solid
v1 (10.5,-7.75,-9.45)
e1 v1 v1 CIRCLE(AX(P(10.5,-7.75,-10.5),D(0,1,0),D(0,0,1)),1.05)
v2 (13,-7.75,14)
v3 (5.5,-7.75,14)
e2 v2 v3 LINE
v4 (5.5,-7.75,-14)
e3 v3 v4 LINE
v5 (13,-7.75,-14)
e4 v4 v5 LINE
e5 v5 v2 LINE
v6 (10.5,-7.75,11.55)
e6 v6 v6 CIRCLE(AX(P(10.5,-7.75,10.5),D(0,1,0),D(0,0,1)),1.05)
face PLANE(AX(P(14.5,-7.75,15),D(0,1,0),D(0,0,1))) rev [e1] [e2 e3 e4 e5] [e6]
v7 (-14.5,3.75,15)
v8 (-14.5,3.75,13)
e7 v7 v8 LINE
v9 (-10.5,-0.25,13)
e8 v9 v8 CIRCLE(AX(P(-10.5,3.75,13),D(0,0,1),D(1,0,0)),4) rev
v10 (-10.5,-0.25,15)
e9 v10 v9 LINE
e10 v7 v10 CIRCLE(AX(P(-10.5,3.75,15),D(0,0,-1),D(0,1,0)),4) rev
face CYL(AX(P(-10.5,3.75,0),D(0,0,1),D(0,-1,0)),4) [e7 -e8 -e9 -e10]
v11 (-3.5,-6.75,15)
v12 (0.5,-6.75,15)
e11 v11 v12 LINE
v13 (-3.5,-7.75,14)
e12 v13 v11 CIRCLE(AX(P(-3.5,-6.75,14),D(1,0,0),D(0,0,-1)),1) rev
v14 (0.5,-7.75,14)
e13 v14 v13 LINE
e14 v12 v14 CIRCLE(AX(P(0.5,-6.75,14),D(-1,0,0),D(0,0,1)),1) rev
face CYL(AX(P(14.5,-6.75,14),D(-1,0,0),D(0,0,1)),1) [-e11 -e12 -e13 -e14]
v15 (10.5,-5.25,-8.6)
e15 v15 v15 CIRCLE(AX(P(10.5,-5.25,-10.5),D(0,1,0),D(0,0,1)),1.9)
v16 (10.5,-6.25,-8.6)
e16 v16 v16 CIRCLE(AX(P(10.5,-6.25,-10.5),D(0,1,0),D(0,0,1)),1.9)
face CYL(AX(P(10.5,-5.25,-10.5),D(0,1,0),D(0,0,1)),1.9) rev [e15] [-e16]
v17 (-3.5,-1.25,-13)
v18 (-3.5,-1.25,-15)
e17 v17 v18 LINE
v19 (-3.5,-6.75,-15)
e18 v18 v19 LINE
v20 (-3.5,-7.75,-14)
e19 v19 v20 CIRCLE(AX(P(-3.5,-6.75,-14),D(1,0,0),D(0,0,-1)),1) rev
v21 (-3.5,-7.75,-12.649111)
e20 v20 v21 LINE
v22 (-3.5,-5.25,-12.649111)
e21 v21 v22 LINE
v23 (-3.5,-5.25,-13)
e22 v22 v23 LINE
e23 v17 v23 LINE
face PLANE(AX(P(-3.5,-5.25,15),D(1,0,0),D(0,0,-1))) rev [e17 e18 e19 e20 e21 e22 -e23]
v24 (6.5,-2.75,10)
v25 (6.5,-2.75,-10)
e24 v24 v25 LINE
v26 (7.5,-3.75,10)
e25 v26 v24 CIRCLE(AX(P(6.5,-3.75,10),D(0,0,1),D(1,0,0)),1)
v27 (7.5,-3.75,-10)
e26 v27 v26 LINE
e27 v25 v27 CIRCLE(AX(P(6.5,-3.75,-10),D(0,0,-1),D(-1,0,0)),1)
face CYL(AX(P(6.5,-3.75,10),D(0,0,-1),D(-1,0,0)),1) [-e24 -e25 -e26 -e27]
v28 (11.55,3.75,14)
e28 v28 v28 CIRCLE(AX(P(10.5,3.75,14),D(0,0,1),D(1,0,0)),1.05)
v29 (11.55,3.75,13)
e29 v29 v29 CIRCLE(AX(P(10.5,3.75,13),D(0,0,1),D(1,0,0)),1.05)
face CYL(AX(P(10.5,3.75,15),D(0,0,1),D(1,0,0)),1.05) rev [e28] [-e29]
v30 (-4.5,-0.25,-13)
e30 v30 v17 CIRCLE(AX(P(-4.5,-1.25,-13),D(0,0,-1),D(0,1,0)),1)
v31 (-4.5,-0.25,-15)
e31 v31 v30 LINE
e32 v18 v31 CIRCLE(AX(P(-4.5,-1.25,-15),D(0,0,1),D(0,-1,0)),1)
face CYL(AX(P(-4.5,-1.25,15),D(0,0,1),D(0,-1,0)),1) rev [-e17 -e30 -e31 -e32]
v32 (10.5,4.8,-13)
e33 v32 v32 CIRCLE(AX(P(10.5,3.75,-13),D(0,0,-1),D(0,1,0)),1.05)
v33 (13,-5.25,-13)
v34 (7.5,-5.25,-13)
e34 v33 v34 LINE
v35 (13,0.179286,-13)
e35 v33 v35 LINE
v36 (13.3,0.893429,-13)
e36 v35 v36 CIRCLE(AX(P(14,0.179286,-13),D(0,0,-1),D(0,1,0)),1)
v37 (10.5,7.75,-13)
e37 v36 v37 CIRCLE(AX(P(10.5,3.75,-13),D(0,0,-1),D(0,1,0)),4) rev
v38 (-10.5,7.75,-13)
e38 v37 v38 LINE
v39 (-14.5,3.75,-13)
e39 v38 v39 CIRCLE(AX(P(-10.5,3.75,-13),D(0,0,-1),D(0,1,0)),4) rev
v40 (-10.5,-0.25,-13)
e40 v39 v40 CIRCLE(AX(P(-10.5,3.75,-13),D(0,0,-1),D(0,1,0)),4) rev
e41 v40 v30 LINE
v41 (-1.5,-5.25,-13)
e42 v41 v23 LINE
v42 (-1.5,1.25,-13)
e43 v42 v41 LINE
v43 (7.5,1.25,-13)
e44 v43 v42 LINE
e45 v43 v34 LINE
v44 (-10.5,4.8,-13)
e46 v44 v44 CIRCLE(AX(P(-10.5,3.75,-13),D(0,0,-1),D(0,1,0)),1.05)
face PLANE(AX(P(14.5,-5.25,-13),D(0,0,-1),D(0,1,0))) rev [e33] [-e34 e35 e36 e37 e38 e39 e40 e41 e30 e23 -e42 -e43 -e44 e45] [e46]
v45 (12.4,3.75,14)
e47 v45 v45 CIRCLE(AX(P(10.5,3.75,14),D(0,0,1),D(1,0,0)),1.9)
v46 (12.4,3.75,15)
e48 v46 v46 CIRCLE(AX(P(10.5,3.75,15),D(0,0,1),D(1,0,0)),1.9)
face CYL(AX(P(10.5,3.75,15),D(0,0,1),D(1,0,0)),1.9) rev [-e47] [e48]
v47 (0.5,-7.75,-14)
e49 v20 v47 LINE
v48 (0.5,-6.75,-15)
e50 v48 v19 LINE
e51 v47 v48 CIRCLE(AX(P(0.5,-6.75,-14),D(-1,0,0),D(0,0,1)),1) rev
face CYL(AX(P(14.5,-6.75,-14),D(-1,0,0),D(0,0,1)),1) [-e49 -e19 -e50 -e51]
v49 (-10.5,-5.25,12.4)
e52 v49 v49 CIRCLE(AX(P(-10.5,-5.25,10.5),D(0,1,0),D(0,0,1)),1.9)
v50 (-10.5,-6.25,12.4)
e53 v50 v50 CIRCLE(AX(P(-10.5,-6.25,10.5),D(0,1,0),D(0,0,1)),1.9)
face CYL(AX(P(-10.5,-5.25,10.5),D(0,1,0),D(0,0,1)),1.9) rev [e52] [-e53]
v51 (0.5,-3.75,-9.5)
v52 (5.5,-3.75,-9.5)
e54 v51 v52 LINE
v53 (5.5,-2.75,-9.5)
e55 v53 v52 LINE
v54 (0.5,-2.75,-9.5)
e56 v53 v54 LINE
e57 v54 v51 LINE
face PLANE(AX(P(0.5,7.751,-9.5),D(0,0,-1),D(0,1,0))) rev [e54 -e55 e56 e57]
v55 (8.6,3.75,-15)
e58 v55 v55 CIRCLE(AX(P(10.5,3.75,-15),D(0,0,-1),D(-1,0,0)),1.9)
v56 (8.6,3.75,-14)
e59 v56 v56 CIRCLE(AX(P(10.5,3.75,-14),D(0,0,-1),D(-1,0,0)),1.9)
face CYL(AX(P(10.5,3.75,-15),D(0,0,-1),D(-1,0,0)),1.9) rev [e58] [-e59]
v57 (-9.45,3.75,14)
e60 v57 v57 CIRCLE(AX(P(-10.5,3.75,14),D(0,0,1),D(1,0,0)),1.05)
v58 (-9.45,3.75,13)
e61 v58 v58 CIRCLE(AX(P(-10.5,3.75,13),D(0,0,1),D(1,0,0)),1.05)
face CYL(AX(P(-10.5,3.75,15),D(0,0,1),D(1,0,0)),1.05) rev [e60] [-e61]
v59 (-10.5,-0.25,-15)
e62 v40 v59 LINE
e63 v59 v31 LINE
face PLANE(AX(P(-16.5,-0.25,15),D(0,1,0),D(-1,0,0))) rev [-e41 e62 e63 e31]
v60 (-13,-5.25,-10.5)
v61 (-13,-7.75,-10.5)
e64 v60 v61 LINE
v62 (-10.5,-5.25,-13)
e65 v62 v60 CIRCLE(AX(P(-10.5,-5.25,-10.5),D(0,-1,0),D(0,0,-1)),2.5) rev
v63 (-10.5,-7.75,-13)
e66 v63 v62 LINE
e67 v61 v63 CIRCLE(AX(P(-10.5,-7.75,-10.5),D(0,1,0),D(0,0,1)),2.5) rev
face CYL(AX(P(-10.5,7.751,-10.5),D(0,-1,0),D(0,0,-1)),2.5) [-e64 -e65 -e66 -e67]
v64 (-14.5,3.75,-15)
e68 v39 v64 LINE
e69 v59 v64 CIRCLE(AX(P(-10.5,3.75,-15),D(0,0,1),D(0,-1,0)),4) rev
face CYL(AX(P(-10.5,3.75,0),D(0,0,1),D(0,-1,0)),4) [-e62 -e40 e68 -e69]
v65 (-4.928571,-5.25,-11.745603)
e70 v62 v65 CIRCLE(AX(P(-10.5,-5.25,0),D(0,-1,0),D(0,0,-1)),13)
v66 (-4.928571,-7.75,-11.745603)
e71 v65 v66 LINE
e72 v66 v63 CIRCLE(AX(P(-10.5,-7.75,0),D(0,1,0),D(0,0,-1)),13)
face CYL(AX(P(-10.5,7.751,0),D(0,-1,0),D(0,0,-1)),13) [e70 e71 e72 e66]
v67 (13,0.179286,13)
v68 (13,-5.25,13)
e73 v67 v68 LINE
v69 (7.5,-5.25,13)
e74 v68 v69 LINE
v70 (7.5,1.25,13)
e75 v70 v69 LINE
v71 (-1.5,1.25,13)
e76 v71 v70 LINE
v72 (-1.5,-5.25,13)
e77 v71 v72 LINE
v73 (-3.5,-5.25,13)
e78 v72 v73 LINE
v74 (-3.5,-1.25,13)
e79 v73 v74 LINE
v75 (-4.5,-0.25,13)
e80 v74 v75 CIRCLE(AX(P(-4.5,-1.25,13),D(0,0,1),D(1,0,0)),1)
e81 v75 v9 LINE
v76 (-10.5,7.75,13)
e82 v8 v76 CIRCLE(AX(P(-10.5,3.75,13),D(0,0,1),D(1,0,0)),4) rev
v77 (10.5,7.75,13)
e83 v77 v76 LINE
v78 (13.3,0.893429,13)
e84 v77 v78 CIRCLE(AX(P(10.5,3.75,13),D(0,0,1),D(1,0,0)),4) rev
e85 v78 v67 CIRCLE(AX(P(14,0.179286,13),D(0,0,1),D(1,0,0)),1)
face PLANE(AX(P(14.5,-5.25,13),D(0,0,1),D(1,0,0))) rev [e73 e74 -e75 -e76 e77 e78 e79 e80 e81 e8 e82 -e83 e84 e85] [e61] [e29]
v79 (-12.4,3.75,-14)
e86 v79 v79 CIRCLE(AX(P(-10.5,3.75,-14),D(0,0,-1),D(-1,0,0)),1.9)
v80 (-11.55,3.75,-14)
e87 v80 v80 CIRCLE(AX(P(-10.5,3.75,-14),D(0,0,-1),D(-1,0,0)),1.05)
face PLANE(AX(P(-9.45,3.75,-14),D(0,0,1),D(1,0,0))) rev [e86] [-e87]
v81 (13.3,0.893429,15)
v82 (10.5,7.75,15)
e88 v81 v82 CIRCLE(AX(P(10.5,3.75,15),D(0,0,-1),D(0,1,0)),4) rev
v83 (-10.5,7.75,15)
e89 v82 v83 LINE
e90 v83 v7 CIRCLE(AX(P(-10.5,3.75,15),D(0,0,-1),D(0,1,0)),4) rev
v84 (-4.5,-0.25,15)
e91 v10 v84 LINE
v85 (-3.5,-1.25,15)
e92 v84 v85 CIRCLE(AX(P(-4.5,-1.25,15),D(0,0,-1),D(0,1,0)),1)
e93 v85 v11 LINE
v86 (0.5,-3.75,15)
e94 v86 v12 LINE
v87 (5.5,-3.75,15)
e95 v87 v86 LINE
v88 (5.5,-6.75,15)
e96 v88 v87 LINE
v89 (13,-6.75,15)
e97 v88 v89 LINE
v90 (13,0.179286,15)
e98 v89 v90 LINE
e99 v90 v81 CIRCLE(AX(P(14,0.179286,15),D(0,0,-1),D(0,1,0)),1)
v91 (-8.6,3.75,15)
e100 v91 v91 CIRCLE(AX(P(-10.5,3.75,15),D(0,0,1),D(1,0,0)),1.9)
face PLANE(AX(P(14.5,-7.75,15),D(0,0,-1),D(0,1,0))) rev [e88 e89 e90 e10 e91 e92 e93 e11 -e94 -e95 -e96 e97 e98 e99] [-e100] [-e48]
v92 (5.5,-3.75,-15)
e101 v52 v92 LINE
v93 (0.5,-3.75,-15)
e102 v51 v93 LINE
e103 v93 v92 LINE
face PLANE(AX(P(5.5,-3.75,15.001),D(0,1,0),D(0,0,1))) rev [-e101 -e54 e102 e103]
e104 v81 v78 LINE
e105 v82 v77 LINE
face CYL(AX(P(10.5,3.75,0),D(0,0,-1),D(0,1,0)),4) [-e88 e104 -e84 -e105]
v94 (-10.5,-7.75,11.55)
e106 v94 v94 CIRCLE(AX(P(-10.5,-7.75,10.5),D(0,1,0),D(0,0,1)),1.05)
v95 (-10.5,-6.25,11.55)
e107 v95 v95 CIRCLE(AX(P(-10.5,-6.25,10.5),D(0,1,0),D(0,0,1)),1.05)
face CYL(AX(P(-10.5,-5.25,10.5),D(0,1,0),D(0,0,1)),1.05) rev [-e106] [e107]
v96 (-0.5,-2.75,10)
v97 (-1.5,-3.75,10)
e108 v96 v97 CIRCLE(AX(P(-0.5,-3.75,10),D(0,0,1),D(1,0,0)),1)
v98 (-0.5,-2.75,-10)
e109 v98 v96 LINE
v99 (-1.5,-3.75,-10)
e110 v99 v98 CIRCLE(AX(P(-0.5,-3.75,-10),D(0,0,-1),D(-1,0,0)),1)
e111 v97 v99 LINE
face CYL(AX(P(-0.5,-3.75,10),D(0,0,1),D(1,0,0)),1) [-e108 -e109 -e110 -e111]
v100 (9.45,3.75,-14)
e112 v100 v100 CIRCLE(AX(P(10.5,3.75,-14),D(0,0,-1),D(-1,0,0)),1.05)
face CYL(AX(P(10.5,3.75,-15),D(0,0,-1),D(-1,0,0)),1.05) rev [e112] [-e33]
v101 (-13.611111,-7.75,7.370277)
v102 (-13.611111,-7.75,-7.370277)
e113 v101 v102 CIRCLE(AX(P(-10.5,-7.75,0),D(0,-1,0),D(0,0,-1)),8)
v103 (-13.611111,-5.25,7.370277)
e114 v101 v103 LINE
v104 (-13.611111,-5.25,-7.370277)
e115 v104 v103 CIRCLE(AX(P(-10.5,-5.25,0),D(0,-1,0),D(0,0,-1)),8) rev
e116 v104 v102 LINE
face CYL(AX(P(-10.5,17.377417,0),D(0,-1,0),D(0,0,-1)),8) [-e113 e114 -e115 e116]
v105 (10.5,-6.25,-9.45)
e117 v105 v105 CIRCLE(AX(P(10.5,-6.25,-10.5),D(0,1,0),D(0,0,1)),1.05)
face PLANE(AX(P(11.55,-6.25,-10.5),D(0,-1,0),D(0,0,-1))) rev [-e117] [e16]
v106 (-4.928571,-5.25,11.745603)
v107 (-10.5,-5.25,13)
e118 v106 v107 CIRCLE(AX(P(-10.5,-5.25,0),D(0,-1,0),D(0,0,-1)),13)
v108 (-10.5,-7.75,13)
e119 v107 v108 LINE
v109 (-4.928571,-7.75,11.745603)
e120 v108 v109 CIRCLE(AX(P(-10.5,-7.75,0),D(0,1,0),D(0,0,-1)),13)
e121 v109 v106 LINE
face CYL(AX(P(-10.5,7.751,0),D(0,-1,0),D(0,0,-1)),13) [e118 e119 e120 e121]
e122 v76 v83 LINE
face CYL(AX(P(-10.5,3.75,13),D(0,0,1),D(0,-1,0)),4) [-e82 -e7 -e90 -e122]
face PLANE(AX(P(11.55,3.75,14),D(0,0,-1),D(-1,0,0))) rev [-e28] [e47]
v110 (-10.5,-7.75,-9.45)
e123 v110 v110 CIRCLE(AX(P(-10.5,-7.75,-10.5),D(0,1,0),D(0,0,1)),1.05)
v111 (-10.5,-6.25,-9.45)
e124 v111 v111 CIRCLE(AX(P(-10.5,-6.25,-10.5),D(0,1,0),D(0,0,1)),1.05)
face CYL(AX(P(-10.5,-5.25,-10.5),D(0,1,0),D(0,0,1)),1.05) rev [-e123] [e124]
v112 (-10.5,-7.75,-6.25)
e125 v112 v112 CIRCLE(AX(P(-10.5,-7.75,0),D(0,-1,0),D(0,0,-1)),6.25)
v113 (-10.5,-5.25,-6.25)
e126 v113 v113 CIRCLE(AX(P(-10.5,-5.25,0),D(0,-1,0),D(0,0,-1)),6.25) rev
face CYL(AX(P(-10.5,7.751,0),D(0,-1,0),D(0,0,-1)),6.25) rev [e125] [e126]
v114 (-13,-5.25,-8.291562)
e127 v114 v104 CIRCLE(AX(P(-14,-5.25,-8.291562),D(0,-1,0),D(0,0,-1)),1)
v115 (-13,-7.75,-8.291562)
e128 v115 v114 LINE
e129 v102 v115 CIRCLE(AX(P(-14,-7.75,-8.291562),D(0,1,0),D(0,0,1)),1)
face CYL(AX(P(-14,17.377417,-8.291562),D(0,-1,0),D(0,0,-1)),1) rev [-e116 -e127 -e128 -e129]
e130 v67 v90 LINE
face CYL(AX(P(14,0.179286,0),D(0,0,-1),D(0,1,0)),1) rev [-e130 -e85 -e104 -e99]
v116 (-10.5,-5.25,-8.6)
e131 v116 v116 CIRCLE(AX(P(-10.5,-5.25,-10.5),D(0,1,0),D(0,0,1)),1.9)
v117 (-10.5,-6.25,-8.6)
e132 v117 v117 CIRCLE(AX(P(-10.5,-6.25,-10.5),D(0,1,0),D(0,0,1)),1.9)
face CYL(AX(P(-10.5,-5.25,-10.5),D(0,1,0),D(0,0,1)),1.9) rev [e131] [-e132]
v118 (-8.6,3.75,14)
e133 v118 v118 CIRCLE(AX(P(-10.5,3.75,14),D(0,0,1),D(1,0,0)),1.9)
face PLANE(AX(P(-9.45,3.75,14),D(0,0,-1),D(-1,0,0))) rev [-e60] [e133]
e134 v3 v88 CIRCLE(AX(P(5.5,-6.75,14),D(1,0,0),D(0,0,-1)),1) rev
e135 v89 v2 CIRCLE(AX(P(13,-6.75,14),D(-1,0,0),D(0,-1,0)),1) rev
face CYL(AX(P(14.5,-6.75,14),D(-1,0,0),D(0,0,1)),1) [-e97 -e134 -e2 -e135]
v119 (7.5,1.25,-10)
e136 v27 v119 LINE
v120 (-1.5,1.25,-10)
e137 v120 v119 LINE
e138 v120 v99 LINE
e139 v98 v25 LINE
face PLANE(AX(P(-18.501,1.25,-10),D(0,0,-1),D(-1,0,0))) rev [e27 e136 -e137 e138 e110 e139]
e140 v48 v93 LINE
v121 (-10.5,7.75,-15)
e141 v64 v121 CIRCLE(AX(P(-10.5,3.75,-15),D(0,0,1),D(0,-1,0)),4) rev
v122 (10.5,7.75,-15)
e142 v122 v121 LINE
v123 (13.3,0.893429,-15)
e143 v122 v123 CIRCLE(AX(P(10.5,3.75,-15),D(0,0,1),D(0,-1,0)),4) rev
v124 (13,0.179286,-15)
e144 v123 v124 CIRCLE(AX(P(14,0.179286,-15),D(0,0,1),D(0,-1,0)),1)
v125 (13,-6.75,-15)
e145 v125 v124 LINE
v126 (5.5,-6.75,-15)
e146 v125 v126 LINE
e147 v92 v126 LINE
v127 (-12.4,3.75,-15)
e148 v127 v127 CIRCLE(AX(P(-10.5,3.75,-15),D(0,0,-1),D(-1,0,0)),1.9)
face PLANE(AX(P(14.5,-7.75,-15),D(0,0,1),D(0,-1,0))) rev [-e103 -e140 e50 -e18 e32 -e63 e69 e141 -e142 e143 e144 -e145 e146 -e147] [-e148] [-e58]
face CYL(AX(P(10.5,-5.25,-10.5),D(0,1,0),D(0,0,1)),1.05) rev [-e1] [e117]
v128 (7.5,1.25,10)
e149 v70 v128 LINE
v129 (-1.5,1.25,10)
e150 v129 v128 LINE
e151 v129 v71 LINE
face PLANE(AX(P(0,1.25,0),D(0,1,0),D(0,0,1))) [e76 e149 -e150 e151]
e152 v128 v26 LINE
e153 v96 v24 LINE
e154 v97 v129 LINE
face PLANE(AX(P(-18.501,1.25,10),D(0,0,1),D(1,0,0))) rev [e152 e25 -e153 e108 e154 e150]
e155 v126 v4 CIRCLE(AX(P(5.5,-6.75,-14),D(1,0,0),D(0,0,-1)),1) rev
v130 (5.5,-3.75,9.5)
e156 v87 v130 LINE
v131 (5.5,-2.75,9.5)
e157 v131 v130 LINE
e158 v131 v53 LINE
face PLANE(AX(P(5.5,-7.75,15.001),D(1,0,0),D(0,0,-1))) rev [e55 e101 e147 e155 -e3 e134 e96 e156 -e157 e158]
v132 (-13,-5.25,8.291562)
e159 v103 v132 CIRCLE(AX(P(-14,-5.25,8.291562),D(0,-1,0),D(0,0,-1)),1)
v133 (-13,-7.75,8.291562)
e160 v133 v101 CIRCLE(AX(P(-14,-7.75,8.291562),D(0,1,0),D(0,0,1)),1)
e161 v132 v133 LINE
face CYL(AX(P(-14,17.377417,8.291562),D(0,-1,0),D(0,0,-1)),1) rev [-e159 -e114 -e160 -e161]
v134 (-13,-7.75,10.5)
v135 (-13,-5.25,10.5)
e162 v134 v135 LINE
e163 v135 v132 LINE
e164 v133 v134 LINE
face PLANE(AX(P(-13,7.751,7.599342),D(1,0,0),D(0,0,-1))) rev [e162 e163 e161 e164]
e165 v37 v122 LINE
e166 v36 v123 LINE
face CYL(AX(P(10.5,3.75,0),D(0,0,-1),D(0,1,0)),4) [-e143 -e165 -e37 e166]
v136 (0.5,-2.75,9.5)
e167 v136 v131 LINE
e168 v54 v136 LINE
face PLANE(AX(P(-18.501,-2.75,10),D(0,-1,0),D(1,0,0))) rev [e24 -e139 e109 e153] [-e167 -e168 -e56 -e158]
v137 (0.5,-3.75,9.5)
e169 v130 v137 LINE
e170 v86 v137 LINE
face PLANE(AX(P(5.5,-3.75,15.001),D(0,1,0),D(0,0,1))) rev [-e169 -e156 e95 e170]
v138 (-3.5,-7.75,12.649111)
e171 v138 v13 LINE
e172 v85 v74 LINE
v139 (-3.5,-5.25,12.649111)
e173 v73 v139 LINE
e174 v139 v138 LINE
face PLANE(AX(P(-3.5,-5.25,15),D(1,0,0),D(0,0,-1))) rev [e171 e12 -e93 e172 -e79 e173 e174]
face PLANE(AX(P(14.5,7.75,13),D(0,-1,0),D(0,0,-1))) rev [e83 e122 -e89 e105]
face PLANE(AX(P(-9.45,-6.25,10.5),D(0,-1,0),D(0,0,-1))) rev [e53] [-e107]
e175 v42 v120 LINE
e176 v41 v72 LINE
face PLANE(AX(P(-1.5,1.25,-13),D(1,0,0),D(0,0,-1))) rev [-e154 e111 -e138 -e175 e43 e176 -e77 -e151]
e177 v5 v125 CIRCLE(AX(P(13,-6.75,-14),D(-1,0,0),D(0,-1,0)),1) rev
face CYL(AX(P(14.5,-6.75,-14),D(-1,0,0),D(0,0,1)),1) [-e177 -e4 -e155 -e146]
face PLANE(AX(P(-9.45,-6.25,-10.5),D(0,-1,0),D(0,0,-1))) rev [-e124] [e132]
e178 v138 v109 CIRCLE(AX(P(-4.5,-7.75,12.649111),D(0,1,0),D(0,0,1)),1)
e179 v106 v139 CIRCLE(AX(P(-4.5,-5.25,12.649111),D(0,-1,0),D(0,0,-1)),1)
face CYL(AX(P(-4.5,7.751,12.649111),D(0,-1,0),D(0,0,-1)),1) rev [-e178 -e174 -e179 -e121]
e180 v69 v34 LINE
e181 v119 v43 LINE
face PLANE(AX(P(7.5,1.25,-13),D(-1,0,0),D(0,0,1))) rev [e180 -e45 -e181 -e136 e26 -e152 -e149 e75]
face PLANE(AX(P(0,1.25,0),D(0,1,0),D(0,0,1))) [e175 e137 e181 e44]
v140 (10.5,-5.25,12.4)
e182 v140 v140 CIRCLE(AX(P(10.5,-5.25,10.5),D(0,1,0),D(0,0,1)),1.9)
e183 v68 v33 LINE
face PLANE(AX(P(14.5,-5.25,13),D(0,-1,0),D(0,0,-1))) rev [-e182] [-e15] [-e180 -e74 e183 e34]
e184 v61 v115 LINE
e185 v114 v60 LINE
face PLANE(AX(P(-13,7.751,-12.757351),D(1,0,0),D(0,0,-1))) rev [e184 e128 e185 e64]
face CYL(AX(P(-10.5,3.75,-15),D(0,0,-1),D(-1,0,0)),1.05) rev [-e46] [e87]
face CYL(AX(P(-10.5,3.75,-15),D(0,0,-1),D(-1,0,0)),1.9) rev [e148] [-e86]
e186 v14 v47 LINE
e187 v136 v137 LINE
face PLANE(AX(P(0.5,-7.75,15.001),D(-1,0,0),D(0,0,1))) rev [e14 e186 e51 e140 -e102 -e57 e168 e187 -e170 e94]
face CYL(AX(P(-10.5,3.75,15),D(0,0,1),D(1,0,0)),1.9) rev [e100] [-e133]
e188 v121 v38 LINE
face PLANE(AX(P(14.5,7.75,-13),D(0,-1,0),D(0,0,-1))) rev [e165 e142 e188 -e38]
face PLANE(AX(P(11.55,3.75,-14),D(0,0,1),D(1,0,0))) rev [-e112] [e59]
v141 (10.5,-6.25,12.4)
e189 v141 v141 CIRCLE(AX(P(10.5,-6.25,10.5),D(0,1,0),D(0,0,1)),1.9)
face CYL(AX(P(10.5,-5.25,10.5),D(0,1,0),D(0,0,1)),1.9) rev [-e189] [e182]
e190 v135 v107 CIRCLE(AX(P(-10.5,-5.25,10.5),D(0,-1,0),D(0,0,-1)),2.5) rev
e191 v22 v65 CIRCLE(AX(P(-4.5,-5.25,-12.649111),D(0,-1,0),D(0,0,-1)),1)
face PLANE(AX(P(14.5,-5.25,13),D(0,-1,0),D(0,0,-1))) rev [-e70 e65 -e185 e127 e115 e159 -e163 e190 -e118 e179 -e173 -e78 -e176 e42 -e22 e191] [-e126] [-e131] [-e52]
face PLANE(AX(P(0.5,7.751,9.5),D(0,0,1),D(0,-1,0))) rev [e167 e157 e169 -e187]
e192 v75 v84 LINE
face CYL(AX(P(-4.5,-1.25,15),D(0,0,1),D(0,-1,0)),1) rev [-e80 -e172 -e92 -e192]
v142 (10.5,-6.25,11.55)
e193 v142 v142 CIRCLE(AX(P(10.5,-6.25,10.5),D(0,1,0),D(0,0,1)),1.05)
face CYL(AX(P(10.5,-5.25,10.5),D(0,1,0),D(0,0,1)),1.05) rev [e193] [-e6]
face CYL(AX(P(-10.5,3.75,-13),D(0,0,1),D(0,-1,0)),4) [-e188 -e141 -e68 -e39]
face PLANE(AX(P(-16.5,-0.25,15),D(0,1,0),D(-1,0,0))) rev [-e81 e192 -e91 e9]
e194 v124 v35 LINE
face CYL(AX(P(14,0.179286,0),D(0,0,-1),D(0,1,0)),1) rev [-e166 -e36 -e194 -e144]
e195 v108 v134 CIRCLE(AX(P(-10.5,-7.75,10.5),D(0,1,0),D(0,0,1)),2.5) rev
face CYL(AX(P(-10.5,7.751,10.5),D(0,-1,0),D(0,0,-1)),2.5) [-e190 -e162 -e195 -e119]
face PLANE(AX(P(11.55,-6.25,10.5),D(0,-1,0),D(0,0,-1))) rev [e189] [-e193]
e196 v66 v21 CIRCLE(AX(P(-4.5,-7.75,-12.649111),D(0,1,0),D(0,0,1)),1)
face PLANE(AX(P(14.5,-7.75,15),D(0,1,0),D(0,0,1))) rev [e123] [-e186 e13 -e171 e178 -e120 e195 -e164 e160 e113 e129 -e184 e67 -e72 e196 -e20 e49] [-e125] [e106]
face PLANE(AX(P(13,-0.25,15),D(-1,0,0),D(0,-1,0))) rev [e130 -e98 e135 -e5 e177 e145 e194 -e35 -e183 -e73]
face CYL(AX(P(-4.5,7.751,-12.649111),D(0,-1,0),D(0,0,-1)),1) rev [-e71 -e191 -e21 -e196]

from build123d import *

# Parameters (mm, degrees)
EXTRUDE_1_DEPTH              = 14.5
HOLE_START                   = -15
HOLE_WIZARD_M2_1_OUTLINE_R   = 1.9
HOLE_WIZARD_M2_1_DEPTH       = 1
HOLE_START_2                 = -14
HOLE_WIZARD_M2_1_2_OUTLINE_R = 1.05
HOLE_WIZARD_M2_1_2_DEPTH     = 1
SKETCH_5_R                   = 8
EXTRUDE_2_DEPTH              = 2.5
SKETCH_10_W                  = 3
SKETCH_10_H                  = 10
CUT_EXTRUDE_4_DEPTH          = 37.087567111
SKETCH_9_W                   = 13
SKETCH_9_H                   = 5
CUT_EXTRUDE_3_DEPTH          = 37.087567111
FILLET_1_R                   = 4
CUT_EXTRUDE_START            = -2.5
CUT_EXTRUDE_5_OUTLINE_R      = 6.25
CUT_EXTRUDE_5_DEPTH          = 2.5
HOLE_WIZARD_M2_2_D           = 2.1
HOLE_WIZARD_M2_2_CBORE_D     = 3.8
HOLE_WIZARD_M2_2_CBORE_DEPTH = 1
FILLET_4_R                   = 2.5
FILLET_5_R                   = 1
SKETCH_14_W                  = 9
SKETCH_14_H                  = 26
EXTRUDE_4_DEPTH              = 6.5
CUT_EXTRUDE_6_REACH          = 33.001
SKETCH_15_W                  = 20
SKETCH_15_H                  = 4
CUT_EXTRUDE_7_REACH          = 38.088
SKETCH_16_W                  = 5
SKETCH_16_H                  = 4
CUT_EXTRUDE_8_REACH          = 28.448
SKETCH_17_W                  = 5
SKETCH_17_H                  = 19
CUT_EXTRUDE_9_DEPTH          = 37.087567111
FILLET_6_R                   = 1


# Read off the part's stored shape, not the designer's step: M2 丸平ねじ用座ぐり穴1, ｶｯﾄ - 押し出し5
with BuildPart() as part:
    # ｽｹｯﾁ1 → ﾎﾞｽ - 押し出し1 (new, symmetric)
    with BuildSketch(Plane(origin=(0, 0, 0), x_dir=(0, 0, -1), z_dir=(1, 0, 0))):
        Polygon((-15, -7.75), (15, -7.75), (15, 7.75), (13, 7.75), (13, -5.25), (-13, -5.25), (-13, 7.75), (-15, 7.75), align=None)
    extrude(amount=EXTRUDE_1_DEPTH, both=True)

    # M2 丸平ねじ用座ぐり穴1 outline → M2 丸平ねじ用座ぐり穴1 (cut)
    with BuildSketch(Plane.XY.offset(HOLE_START)):
        with Locations((-10.5, 3.75)):
            Circle(HOLE_WIZARD_M2_1_OUTLINE_R)
        with Locations((10.5, 3.75)):
            Circle(HOLE_WIZARD_M2_1_OUTLINE_R)
    hole_wizard_m2_1 = extrude(amount=HOLE_WIZARD_M2_1_DEPTH, mode=Mode.SUBTRACT)

    # Hole Wizard M2 _1 2 outline → Hole Wizard M2 _1 2 (cut)
    with BuildSketch(Plane.XY.offset(HOLE_START_2)):
        with Locations((-10.5, 3.75)):
            Circle(HOLE_WIZARD_M2_1_2_OUTLINE_R)
        with Locations((10.5, 3.75)):
            Circle(HOLE_WIZARD_M2_1_2_OUTLINE_R)
    hole_wizard_m2_1_2 = extrude(amount=HOLE_WIZARD_M2_1_2_DEPTH, mode=Mode.SUBTRACT)

    # ｽｹｯﾁ5 → ﾎﾞｽ - 押し出し2 (add)
    with BuildSketch(Plane.XZ.offset(7.75)):
        with Locations((-10.5, 0)):
            Circle(SKETCH_5_R)
    extrude(amount=-EXTRUDE_2_DEPTH)

    # ｽｹｯﾁ10 → ｶｯﾄ - 押し出し4 (cut, through all)
    with BuildSketch(Plane(origin=(0, 0, -15), x_dir=(-1, 0, 0), z_dir=(0, 0, -1))):
        with Locations((-14.5, -5.25)):
            Rectangle(SKETCH_10_W, SKETCH_10_H)
    extrude(amount=-CUT_EXTRUDE_4_DEPTH, mode=Mode.SUBTRACT)

    # ｽｹｯﾁ9 → ｶｯﾄ - 押し出し3 (cut, through all)
    with BuildSketch(Plane(origin=(0, 0, -15), x_dir=(-1, 0, 0), z_dir=(0, 0, -1))):
        with Locations((10, -2.75)):
            Rectangle(SKETCH_9_W, SKETCH_9_H)
    extrude(amount=-CUT_EXTRUDE_3_DEPTH, mode=Mode.SUBTRACT)

    # ﾌｨﾚｯﾄ1
    fillet_1_edges = [part.edges().sort_by_distance(p)[0] for p in [
        (-14.5, 7.75, 14),
        (14.5, 7.75, 14),
        (14.5, 7.75, -14),
        (-14.5, 7.75, -14),
        (-14.5, -0.25, 14),
        (-14.5, -0.25, -14),
    ]]
    fillet(fillet_1_edges, radius=FILLET_1_R - 0.0001)  # a hair under: the kernel refuses the full size

    # ｶｯﾄ - 押し出し5 outline → ｶｯﾄ - 押し出し5 (cut)
    with BuildSketch(Plane.XZ.offset(7.75).offset(CUT_EXTRUDE_START)):
        with BuildLine():
            Line((-14.5, -15), (-3.5, -15))
            Line((-3.5, -15), (-3.5, -10.95445115))
            ThreePointArc((-3.5, -10.95445115), (-8.076137007, -12.772035397), (-13, -12.757350822))
            Line((-13, -12.757350822), (-13, -7.599342077))
            ThreePointArc((-13, -7.599342077), (-13.7672782, -7.302389552), (-14.5, -6.92820323))
            Line((-14.5, -6.92820323), (-14.5, -15))
        make_face()
        with BuildLine():
            Line((-14.5, 15), (-14.5, 6.92820323))
            ThreePointArc((-14.5, 6.92820323), (-13.7672782, 7.302389552), (-13, 7.599342077))
            Line((-13, 7.599342077), (-13, 12.757350822))
            ThreePointArc((-13, 12.757350822), (-8.076137007, 12.772035397), (-3.5, 10.95445115))
            Line((-3.5, 10.95445115), (-3.5, 15))
            Line((-3.5, 15), (-14.5, 15))
        make_face()
        with Locations((-10.5, 0)):
            Circle(CUT_EXTRUDE_5_OUTLINE_R)
    extrude(amount=CUT_EXTRUDE_5_DEPTH, mode=Mode.SUBTRACT)

    # M2 丸平ねじ用座ぐり穴2 (through all)
    with Locations(Plane(origin=(0, -5.25, 0), x_dir=(1, 0, 0), z_dir=(0, 1, 0))):
        with Locations((10.5, -10.5), (10.5, 10.5), (-10.5, 10.5), (-10.5, -10.5)):
            CounterBoreHole(HOLE_WIZARD_M2_2_D / 2, HOLE_WIZARD_M2_2_CBORE_D / 2, HOLE_WIZARD_M2_2_CBORE_DEPTH)

    # ﾌｨﾚｯﾄ4
    fillet_4_edges = [part.edges().sort_by_distance(p)[0] for p in [
        (-13, -6.5, -12.757350822),
        (-13, -6.5, 12.757350822),
    ]]
    fillet(fillet_4_edges, radius=FILLET_4_R - 0.0001)  # a hair under: the kernel refuses the full size

    # ﾌｨﾚｯﾄ5
    fillet_5_edges = [part.edges().sort_by_distance(p)[0] for p in [
        (-3.5, -6.5, -10.95445115),
        (-13, -6.5, -7.599342077),
        (-13, -6.5, 7.599342077),
        (-3.5, -6.5, 10.95445115),
    ]]
    fillet(fillet_5_edges, radius=FILLET_5_R)

    # ｽｹｯﾁ14 → ﾎﾞｽ - 押し出し4 (add)
    with BuildSketch(Plane(origin=(0, -5.25, 0), x_dir=(1, 0, 0), z_dir=(0, 1, 0))):
        with Locations((3, 0)):
            Rectangle(SKETCH_14_W, SKETCH_14_H)
    extrude(amount=EXTRUDE_4_DEPTH)

    # ｽｹｯﾁ15 → ｶｯﾄ - 押し出し6 (cut, up to next)
    with BuildSketch(Plane(origin=(7.5, 0, 0), x_dir=(0, 0, -1), z_dir=(1, 0, 0)), mode=Mode.PRIVATE) as cut_extrude_6_sk1:
        with Locations((0, -0.75)):
            Rectangle(SKETCH_15_W, SKETCH_15_H)
    cut_extrude_6_tool1 = extrude(cut_extrude_6_sk1.sketch, amount=-CUT_EXTRUDE_6_REACH, mode=Mode.PRIVATE) & part.part
    add(cut_extrude_6_tool1.solids().sort_by_distance((7.5, -0.75, 0))[0], mode=Mode.SUBTRACT)

    # ｽｹｯﾁ16 → ｶｯﾄ - 押し出し7 (cut, up to next)
    with BuildSketch(Plane(origin=(0, 0, -15), x_dir=(-1, 0, 0), z_dir=(0, 0, -1)), mode=Mode.PRIVATE) as cut_extrude_7_sk1:
        with Locations((-3, -5.75)):
            Rectangle(SKETCH_16_W, SKETCH_16_H)
    cut_extrude_7_tool1 = extrude(cut_extrude_7_sk1.sketch, amount=-CUT_EXTRUDE_7_REACH, mode=Mode.PRIVATE) & part.part
    add(cut_extrude_7_tool1.solids().sort_by_distance((3, -5.75, -15))[0], mode=Mode.SUBTRACT)

    # ｽｹｯﾁ17 → ｶｯﾄ - 押し出し8 (cut, up to next)
    with BuildSketch(Plane.XZ.offset(3.75), mode=Mode.PRIVATE) as cut_extrude_8_sk1:
        with Locations((3, 0)):
            Rectangle(SKETCH_17_W, SKETCH_17_H)
    cut_extrude_8_tool1 = extrude(cut_extrude_8_sk1.sketch, amount=-CUT_EXTRUDE_8_REACH, mode=Mode.PRIVATE) & part.part
    add(cut_extrude_8_tool1.solids().sort_by_distance((3, -3.75, 0))[0], mode=Mode.SUBTRACT)

    # ﾐﾗｰ1: M2 丸平ねじ用座ぐり穴1, Hole Wizard M2 _1 2 across plane
    add(hole_wizard_m2_1.mirror(Plane.XY), mode=Mode.SUBTRACT)
    add(hole_wizard_m2_1_2.mirror(Plane.XY), mode=Mode.SUBTRACT)

    # ｽｹｯﾁ18 → ｶｯﾄ - 押し出し9 (cut, through all)
    with BuildSketch(Plane(origin=(0, 0, -15), x_dir=(-1, 0, 0), z_dir=(0, 0, -1))):
        with BuildLine():
            Line((-14.5, 3.75), (-14.5, -0.25))
            Line((-14.5, -0.25), (-13, -0.25))
            Line((-13, -0.25), (-13, 0.627501001))
            ThreePointArc((-13, 0.627501001), (-14.105551275, 2.017949192), (-14.5, 3.75))
        make_face()
    extrude(amount=-CUT_EXTRUDE_9_DEPTH, mode=Mode.SUBTRACT)

    # ﾌｨﾚｯﾄ6
    fillet_6_edges = [part.edges().sort_by_distance(p)[0] for p in [
        (7.5, -2.75, 0),
        (-1.5, -2.75, 0),
        (-1.5, -7.75, -15),
        (-1.5, -7.75, 15),
        (13, 0.627501001, 14),
        (13, 0.627501001, -14),
        (9.25, -7.75, -15),
        (9.25, -7.75, 15),
        (-3.5, -0.25, 14),
        (-3.5, -0.25, -14),
    ]]
    fillet(fillet_6_edges, radius=FILLET_6_R)


solid = part.part
